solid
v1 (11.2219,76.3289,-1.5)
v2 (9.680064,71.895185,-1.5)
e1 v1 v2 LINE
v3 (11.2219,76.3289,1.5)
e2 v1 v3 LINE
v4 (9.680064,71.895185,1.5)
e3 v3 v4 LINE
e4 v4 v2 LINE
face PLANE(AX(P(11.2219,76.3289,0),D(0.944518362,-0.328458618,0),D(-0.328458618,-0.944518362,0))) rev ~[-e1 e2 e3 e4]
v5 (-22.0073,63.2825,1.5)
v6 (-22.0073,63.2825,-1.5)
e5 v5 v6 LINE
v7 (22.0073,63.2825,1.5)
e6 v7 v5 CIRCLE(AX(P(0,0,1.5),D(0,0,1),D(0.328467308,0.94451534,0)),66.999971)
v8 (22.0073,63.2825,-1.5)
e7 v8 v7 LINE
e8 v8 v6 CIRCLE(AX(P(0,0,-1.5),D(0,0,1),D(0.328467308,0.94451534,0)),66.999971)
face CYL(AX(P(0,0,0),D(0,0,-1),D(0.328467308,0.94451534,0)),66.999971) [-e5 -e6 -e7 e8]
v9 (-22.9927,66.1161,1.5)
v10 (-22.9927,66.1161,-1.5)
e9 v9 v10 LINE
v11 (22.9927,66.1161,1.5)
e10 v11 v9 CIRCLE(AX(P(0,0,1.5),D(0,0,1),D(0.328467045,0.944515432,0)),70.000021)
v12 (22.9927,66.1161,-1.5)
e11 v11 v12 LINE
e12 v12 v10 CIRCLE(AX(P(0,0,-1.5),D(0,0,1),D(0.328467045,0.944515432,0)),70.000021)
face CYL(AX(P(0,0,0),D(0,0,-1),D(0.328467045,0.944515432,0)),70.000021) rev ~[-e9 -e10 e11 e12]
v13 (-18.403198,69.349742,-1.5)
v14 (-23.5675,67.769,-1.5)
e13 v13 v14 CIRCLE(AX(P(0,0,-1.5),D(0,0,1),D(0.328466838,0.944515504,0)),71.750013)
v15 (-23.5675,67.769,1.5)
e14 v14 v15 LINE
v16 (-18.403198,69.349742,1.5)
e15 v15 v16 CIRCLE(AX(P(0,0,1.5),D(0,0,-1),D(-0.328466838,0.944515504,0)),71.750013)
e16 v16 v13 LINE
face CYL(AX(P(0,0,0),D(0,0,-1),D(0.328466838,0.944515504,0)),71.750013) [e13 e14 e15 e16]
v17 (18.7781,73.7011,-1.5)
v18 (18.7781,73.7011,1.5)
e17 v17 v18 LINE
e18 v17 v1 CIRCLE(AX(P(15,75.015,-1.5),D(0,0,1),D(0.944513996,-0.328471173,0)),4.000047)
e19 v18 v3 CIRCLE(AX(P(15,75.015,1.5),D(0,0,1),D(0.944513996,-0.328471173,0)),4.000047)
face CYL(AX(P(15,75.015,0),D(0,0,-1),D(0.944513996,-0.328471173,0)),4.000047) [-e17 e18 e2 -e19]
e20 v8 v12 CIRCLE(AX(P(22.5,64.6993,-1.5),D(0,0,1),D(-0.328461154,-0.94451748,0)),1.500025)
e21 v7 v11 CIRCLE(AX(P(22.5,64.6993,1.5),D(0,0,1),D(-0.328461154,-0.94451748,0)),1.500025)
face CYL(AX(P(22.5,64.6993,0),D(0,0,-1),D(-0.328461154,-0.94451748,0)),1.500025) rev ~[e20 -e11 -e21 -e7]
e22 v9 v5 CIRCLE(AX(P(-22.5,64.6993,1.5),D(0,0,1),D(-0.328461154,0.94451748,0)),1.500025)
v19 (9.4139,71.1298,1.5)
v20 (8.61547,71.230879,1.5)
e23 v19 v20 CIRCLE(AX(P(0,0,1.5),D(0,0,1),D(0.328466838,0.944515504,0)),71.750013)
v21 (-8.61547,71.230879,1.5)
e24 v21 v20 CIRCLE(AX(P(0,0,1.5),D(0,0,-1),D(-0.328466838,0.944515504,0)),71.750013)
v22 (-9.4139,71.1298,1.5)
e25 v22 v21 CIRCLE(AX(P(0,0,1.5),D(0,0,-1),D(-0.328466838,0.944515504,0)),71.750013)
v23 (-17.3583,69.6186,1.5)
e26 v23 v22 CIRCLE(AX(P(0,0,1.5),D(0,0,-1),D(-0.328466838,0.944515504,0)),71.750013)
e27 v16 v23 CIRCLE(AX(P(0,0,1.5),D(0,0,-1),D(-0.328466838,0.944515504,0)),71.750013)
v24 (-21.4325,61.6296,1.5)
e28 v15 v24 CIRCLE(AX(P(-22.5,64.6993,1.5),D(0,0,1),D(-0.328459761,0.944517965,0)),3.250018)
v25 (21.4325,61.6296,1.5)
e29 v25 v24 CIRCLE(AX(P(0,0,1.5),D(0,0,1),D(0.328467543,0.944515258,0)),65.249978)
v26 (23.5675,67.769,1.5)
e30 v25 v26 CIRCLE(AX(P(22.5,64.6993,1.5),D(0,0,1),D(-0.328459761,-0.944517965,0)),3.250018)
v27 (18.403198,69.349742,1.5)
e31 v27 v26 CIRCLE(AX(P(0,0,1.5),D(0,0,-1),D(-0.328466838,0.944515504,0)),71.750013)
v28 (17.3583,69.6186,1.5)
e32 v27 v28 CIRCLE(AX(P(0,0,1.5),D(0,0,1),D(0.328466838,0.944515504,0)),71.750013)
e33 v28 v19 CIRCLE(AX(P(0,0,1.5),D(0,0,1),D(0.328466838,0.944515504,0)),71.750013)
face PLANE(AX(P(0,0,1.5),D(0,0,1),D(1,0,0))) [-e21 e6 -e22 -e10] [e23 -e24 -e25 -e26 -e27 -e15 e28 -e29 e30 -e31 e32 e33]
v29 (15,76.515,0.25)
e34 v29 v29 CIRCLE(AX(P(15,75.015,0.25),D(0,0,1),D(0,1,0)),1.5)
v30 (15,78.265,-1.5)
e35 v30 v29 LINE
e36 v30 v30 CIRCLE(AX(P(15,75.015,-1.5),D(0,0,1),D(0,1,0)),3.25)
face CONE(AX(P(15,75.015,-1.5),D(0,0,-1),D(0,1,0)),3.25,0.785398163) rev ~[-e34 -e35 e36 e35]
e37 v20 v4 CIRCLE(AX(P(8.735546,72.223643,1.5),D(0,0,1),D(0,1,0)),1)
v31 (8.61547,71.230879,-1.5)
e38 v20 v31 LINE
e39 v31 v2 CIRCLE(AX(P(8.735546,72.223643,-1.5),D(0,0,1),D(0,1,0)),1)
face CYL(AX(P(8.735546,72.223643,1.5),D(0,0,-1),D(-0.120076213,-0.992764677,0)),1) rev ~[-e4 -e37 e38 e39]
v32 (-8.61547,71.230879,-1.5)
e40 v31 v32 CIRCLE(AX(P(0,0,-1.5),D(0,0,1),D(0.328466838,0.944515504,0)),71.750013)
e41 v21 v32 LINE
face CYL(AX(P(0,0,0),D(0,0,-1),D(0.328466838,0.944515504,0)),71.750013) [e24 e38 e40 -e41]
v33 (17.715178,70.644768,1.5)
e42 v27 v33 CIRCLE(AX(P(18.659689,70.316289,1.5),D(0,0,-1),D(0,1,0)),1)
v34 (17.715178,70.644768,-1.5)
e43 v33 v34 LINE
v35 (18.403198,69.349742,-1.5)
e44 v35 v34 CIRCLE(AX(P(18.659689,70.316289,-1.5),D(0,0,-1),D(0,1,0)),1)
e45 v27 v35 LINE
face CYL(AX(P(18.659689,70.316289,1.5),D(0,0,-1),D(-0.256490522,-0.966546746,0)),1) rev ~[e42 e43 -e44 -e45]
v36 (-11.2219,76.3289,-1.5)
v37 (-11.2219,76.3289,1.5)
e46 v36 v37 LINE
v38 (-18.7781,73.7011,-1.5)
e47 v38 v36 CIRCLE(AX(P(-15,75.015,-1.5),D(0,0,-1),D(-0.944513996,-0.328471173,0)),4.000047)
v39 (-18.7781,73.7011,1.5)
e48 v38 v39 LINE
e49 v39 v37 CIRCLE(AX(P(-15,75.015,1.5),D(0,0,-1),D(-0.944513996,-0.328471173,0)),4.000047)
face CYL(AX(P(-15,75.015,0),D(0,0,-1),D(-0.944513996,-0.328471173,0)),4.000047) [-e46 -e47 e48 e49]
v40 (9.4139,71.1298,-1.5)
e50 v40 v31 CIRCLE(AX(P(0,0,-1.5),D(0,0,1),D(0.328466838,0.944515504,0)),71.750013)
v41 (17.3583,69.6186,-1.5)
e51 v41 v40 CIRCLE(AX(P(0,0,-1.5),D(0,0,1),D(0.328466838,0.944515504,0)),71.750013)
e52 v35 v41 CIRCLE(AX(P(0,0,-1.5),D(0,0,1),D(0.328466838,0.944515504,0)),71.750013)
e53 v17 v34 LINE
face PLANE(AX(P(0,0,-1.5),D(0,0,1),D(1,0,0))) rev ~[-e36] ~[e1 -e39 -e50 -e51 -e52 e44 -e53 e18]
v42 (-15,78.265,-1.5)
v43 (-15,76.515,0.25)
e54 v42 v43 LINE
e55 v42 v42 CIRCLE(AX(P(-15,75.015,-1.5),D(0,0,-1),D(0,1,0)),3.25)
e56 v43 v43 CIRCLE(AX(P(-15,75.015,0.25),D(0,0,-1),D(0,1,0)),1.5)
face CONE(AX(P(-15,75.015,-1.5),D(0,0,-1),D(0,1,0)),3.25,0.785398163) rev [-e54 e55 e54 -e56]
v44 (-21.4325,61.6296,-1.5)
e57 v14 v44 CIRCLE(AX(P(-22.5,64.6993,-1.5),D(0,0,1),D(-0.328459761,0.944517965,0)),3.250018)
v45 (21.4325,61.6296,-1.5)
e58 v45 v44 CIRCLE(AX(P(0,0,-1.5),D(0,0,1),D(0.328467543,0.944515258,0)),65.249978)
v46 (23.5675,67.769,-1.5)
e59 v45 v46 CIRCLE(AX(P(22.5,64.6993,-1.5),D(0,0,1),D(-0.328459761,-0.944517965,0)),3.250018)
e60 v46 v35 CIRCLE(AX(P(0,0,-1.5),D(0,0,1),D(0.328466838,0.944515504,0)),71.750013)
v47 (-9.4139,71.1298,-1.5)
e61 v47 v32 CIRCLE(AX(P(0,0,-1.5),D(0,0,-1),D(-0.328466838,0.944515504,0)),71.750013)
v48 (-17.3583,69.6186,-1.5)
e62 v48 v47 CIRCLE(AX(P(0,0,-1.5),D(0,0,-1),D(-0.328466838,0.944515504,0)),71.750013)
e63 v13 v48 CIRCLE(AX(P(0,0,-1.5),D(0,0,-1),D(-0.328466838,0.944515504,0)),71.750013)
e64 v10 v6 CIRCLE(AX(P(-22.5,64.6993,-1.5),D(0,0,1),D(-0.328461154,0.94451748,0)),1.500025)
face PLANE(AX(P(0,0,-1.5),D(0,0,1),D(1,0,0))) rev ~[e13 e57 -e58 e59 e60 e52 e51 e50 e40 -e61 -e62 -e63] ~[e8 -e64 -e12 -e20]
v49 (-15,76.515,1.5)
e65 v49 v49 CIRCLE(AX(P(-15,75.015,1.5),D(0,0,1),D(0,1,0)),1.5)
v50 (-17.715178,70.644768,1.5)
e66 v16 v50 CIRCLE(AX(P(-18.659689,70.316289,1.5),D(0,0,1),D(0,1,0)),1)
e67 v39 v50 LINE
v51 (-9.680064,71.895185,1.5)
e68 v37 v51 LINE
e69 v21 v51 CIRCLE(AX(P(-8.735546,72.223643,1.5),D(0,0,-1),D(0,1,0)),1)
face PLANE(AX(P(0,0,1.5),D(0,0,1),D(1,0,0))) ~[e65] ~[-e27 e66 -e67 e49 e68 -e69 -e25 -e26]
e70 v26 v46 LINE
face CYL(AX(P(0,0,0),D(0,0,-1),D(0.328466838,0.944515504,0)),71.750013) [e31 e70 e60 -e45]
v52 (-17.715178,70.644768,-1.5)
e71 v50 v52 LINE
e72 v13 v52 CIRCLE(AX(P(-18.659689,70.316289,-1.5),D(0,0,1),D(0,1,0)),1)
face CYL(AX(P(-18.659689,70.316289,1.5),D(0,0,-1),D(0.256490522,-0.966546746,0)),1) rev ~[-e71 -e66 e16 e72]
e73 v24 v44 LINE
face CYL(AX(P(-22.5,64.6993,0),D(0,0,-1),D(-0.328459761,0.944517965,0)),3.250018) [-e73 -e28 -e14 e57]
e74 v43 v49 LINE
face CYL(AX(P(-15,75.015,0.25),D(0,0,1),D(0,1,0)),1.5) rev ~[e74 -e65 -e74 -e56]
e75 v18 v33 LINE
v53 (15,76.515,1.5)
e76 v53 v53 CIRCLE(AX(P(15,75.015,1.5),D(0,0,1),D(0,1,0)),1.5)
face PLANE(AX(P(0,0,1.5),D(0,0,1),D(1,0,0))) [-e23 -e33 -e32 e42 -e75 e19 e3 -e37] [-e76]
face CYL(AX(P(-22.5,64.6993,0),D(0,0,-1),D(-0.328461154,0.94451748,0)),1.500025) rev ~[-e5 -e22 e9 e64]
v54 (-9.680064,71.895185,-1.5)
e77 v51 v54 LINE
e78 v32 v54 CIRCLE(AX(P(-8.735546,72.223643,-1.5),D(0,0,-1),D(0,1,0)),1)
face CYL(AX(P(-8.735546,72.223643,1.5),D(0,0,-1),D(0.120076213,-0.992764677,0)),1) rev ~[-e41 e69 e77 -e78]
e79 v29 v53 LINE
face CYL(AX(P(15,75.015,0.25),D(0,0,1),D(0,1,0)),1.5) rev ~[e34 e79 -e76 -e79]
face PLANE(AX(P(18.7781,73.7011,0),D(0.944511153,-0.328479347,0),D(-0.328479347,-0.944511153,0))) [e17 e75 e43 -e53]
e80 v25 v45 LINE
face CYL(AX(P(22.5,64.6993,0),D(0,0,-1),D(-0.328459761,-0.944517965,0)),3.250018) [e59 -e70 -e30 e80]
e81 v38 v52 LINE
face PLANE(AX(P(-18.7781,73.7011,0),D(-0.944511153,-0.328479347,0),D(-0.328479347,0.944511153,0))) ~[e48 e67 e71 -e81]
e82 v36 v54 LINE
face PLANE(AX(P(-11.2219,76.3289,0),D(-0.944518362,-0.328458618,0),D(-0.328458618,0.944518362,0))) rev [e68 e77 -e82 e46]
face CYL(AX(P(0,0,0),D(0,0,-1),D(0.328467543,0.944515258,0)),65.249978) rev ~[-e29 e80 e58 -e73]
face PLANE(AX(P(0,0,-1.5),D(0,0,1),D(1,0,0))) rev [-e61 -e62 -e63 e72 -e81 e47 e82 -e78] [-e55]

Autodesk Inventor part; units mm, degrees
ref_plane "YZ Plane" through (0, 0, 0) normal (1, 0, 0) x (0, 1, 0)
ref_plane "XZ Plane" through (0, 0, 0) normal (0, 1, 0) x (-1, 0, 0)
ref_plane "XY Plane" through (0, 0, 0) normal (0, 0, 1) x (1, 0, 0)
sketch "Sketch3" plane through (0, 0, 0) normal (0, 0, 1) x (1, 0, 0)
  line L0 (18.7781, 73.7011) -> (17.3583, 69.6186)
  line L1 (22.5, 64.6993) -> (23.5675, 67.769) construction
  line L2 (11.2219, 76.3289) -> (9.4139, 71.1298)
  arc A0 (22.0073, 63.2825) -> (22.9927, 66.1161) centre (22.5, 64.6993) ccw
  circle A1 centre (22.5, 64.6993) radius 1.5 construction
  arc A2 (21.4325, 61.6296) -> (23.5675, 67.769) centre (22.5, 64.6993) ccw
  arc A3 (21.4325, 61.6296) -> (-21.4325, 61.6296) centre (0, 0) ccw
  arc A4 (22.0073, 63.2825) -> (-22.0073, 63.2825) centre (0, 0) ccw
  arc A5 (22.5, 64.6993) -> (-22.5, 64.6993) centre (0, 0) ccw construction
  arc A6 (23.5675, 67.769) -> (-23.5675, 67.769) centre (0, 0) ccw
  circle A7 centre (0, 0) radius 76.5 construction
  circle A8 centre (0, 0) radius 68.5 construction
  arc A9 (22.9927, 66.1161) -> (-22.9927, 66.1161) centre (0, 0) ccw
  circle A10 centre (-22.5, 64.6993) radius 1.5 construction
  arc A11 (-22.9927, 66.1161) -> (-22.0073, 63.2825) centre (-22.5, 64.6993) ccw
  arc A12 (-23.5675, 67.769) -> (-21.4325, 61.6296) centre (-22.5, 64.6993) ccw
  arc A13 (18.7781, 73.7011) -> (11.2219, 76.3289) centre (15, 75.015) ccw
  dimension "d32" = 153
  dimension "d33" = 8
  dimension "d34" = 3.25
  dimension "d35" = 45
  dimension "d36" = 22.5
  dimension "d37" = 3
  dimension "d38" = 8
  dimension "d39" = 15
  dimension "d40" = 0
  dimension "d41" = 71.75
extrude "Extrusion4" add sketch "Sketch3" along normal mid plane 3 contours A6 A2 A3 A12
extrude "Extrusion5" add sketch "Sketch3" along normal mid plane 3 contours L0 A6 L2 A13
sketch "Sketch5" plane through (0, 0, -1.5) normal (0, 0, -1) x (-1, 0, 0)
  circle A0 centre (-15, 75.015) radius 1.5
  arc A1 (-11.2219, 76.3289) -> (-18.7781, 73.7011) centre (-15, 75.015) ccw
  line L0 (-18.7781, 73.7011) -> (-17.3583, 69.6186)
  point P0 (0, 0)
  point P1 (0, 0)
  dimension "d46" = 3
  dimension "d47" = 0
  dimension "d48" = 4
hole "Hole1" at (15, 75.015, -1.5) direction (0, 0, 1) diameter 3 end through all countersink diameter 6.5 countersink angle 90
mirror "Mirror1" about plane through (0, 0, 0) normal (1, 0, 0) of "Hole1", "Extrusion5"
fillet "Fillet1" radius 1 4 edges at (-17.3583, 69.6186, 0) (-9.4139, 71.1298, 0) (17.3583, 69.6186, 0) (9.4139, 71.1298, 0)
sketch "Sketch6" plane through (0, 0, 1.5) normal (0, 0, 1) x (1, 0, 0)
  point P0 (0, 0)
properties part number "reverse gear gear link"
